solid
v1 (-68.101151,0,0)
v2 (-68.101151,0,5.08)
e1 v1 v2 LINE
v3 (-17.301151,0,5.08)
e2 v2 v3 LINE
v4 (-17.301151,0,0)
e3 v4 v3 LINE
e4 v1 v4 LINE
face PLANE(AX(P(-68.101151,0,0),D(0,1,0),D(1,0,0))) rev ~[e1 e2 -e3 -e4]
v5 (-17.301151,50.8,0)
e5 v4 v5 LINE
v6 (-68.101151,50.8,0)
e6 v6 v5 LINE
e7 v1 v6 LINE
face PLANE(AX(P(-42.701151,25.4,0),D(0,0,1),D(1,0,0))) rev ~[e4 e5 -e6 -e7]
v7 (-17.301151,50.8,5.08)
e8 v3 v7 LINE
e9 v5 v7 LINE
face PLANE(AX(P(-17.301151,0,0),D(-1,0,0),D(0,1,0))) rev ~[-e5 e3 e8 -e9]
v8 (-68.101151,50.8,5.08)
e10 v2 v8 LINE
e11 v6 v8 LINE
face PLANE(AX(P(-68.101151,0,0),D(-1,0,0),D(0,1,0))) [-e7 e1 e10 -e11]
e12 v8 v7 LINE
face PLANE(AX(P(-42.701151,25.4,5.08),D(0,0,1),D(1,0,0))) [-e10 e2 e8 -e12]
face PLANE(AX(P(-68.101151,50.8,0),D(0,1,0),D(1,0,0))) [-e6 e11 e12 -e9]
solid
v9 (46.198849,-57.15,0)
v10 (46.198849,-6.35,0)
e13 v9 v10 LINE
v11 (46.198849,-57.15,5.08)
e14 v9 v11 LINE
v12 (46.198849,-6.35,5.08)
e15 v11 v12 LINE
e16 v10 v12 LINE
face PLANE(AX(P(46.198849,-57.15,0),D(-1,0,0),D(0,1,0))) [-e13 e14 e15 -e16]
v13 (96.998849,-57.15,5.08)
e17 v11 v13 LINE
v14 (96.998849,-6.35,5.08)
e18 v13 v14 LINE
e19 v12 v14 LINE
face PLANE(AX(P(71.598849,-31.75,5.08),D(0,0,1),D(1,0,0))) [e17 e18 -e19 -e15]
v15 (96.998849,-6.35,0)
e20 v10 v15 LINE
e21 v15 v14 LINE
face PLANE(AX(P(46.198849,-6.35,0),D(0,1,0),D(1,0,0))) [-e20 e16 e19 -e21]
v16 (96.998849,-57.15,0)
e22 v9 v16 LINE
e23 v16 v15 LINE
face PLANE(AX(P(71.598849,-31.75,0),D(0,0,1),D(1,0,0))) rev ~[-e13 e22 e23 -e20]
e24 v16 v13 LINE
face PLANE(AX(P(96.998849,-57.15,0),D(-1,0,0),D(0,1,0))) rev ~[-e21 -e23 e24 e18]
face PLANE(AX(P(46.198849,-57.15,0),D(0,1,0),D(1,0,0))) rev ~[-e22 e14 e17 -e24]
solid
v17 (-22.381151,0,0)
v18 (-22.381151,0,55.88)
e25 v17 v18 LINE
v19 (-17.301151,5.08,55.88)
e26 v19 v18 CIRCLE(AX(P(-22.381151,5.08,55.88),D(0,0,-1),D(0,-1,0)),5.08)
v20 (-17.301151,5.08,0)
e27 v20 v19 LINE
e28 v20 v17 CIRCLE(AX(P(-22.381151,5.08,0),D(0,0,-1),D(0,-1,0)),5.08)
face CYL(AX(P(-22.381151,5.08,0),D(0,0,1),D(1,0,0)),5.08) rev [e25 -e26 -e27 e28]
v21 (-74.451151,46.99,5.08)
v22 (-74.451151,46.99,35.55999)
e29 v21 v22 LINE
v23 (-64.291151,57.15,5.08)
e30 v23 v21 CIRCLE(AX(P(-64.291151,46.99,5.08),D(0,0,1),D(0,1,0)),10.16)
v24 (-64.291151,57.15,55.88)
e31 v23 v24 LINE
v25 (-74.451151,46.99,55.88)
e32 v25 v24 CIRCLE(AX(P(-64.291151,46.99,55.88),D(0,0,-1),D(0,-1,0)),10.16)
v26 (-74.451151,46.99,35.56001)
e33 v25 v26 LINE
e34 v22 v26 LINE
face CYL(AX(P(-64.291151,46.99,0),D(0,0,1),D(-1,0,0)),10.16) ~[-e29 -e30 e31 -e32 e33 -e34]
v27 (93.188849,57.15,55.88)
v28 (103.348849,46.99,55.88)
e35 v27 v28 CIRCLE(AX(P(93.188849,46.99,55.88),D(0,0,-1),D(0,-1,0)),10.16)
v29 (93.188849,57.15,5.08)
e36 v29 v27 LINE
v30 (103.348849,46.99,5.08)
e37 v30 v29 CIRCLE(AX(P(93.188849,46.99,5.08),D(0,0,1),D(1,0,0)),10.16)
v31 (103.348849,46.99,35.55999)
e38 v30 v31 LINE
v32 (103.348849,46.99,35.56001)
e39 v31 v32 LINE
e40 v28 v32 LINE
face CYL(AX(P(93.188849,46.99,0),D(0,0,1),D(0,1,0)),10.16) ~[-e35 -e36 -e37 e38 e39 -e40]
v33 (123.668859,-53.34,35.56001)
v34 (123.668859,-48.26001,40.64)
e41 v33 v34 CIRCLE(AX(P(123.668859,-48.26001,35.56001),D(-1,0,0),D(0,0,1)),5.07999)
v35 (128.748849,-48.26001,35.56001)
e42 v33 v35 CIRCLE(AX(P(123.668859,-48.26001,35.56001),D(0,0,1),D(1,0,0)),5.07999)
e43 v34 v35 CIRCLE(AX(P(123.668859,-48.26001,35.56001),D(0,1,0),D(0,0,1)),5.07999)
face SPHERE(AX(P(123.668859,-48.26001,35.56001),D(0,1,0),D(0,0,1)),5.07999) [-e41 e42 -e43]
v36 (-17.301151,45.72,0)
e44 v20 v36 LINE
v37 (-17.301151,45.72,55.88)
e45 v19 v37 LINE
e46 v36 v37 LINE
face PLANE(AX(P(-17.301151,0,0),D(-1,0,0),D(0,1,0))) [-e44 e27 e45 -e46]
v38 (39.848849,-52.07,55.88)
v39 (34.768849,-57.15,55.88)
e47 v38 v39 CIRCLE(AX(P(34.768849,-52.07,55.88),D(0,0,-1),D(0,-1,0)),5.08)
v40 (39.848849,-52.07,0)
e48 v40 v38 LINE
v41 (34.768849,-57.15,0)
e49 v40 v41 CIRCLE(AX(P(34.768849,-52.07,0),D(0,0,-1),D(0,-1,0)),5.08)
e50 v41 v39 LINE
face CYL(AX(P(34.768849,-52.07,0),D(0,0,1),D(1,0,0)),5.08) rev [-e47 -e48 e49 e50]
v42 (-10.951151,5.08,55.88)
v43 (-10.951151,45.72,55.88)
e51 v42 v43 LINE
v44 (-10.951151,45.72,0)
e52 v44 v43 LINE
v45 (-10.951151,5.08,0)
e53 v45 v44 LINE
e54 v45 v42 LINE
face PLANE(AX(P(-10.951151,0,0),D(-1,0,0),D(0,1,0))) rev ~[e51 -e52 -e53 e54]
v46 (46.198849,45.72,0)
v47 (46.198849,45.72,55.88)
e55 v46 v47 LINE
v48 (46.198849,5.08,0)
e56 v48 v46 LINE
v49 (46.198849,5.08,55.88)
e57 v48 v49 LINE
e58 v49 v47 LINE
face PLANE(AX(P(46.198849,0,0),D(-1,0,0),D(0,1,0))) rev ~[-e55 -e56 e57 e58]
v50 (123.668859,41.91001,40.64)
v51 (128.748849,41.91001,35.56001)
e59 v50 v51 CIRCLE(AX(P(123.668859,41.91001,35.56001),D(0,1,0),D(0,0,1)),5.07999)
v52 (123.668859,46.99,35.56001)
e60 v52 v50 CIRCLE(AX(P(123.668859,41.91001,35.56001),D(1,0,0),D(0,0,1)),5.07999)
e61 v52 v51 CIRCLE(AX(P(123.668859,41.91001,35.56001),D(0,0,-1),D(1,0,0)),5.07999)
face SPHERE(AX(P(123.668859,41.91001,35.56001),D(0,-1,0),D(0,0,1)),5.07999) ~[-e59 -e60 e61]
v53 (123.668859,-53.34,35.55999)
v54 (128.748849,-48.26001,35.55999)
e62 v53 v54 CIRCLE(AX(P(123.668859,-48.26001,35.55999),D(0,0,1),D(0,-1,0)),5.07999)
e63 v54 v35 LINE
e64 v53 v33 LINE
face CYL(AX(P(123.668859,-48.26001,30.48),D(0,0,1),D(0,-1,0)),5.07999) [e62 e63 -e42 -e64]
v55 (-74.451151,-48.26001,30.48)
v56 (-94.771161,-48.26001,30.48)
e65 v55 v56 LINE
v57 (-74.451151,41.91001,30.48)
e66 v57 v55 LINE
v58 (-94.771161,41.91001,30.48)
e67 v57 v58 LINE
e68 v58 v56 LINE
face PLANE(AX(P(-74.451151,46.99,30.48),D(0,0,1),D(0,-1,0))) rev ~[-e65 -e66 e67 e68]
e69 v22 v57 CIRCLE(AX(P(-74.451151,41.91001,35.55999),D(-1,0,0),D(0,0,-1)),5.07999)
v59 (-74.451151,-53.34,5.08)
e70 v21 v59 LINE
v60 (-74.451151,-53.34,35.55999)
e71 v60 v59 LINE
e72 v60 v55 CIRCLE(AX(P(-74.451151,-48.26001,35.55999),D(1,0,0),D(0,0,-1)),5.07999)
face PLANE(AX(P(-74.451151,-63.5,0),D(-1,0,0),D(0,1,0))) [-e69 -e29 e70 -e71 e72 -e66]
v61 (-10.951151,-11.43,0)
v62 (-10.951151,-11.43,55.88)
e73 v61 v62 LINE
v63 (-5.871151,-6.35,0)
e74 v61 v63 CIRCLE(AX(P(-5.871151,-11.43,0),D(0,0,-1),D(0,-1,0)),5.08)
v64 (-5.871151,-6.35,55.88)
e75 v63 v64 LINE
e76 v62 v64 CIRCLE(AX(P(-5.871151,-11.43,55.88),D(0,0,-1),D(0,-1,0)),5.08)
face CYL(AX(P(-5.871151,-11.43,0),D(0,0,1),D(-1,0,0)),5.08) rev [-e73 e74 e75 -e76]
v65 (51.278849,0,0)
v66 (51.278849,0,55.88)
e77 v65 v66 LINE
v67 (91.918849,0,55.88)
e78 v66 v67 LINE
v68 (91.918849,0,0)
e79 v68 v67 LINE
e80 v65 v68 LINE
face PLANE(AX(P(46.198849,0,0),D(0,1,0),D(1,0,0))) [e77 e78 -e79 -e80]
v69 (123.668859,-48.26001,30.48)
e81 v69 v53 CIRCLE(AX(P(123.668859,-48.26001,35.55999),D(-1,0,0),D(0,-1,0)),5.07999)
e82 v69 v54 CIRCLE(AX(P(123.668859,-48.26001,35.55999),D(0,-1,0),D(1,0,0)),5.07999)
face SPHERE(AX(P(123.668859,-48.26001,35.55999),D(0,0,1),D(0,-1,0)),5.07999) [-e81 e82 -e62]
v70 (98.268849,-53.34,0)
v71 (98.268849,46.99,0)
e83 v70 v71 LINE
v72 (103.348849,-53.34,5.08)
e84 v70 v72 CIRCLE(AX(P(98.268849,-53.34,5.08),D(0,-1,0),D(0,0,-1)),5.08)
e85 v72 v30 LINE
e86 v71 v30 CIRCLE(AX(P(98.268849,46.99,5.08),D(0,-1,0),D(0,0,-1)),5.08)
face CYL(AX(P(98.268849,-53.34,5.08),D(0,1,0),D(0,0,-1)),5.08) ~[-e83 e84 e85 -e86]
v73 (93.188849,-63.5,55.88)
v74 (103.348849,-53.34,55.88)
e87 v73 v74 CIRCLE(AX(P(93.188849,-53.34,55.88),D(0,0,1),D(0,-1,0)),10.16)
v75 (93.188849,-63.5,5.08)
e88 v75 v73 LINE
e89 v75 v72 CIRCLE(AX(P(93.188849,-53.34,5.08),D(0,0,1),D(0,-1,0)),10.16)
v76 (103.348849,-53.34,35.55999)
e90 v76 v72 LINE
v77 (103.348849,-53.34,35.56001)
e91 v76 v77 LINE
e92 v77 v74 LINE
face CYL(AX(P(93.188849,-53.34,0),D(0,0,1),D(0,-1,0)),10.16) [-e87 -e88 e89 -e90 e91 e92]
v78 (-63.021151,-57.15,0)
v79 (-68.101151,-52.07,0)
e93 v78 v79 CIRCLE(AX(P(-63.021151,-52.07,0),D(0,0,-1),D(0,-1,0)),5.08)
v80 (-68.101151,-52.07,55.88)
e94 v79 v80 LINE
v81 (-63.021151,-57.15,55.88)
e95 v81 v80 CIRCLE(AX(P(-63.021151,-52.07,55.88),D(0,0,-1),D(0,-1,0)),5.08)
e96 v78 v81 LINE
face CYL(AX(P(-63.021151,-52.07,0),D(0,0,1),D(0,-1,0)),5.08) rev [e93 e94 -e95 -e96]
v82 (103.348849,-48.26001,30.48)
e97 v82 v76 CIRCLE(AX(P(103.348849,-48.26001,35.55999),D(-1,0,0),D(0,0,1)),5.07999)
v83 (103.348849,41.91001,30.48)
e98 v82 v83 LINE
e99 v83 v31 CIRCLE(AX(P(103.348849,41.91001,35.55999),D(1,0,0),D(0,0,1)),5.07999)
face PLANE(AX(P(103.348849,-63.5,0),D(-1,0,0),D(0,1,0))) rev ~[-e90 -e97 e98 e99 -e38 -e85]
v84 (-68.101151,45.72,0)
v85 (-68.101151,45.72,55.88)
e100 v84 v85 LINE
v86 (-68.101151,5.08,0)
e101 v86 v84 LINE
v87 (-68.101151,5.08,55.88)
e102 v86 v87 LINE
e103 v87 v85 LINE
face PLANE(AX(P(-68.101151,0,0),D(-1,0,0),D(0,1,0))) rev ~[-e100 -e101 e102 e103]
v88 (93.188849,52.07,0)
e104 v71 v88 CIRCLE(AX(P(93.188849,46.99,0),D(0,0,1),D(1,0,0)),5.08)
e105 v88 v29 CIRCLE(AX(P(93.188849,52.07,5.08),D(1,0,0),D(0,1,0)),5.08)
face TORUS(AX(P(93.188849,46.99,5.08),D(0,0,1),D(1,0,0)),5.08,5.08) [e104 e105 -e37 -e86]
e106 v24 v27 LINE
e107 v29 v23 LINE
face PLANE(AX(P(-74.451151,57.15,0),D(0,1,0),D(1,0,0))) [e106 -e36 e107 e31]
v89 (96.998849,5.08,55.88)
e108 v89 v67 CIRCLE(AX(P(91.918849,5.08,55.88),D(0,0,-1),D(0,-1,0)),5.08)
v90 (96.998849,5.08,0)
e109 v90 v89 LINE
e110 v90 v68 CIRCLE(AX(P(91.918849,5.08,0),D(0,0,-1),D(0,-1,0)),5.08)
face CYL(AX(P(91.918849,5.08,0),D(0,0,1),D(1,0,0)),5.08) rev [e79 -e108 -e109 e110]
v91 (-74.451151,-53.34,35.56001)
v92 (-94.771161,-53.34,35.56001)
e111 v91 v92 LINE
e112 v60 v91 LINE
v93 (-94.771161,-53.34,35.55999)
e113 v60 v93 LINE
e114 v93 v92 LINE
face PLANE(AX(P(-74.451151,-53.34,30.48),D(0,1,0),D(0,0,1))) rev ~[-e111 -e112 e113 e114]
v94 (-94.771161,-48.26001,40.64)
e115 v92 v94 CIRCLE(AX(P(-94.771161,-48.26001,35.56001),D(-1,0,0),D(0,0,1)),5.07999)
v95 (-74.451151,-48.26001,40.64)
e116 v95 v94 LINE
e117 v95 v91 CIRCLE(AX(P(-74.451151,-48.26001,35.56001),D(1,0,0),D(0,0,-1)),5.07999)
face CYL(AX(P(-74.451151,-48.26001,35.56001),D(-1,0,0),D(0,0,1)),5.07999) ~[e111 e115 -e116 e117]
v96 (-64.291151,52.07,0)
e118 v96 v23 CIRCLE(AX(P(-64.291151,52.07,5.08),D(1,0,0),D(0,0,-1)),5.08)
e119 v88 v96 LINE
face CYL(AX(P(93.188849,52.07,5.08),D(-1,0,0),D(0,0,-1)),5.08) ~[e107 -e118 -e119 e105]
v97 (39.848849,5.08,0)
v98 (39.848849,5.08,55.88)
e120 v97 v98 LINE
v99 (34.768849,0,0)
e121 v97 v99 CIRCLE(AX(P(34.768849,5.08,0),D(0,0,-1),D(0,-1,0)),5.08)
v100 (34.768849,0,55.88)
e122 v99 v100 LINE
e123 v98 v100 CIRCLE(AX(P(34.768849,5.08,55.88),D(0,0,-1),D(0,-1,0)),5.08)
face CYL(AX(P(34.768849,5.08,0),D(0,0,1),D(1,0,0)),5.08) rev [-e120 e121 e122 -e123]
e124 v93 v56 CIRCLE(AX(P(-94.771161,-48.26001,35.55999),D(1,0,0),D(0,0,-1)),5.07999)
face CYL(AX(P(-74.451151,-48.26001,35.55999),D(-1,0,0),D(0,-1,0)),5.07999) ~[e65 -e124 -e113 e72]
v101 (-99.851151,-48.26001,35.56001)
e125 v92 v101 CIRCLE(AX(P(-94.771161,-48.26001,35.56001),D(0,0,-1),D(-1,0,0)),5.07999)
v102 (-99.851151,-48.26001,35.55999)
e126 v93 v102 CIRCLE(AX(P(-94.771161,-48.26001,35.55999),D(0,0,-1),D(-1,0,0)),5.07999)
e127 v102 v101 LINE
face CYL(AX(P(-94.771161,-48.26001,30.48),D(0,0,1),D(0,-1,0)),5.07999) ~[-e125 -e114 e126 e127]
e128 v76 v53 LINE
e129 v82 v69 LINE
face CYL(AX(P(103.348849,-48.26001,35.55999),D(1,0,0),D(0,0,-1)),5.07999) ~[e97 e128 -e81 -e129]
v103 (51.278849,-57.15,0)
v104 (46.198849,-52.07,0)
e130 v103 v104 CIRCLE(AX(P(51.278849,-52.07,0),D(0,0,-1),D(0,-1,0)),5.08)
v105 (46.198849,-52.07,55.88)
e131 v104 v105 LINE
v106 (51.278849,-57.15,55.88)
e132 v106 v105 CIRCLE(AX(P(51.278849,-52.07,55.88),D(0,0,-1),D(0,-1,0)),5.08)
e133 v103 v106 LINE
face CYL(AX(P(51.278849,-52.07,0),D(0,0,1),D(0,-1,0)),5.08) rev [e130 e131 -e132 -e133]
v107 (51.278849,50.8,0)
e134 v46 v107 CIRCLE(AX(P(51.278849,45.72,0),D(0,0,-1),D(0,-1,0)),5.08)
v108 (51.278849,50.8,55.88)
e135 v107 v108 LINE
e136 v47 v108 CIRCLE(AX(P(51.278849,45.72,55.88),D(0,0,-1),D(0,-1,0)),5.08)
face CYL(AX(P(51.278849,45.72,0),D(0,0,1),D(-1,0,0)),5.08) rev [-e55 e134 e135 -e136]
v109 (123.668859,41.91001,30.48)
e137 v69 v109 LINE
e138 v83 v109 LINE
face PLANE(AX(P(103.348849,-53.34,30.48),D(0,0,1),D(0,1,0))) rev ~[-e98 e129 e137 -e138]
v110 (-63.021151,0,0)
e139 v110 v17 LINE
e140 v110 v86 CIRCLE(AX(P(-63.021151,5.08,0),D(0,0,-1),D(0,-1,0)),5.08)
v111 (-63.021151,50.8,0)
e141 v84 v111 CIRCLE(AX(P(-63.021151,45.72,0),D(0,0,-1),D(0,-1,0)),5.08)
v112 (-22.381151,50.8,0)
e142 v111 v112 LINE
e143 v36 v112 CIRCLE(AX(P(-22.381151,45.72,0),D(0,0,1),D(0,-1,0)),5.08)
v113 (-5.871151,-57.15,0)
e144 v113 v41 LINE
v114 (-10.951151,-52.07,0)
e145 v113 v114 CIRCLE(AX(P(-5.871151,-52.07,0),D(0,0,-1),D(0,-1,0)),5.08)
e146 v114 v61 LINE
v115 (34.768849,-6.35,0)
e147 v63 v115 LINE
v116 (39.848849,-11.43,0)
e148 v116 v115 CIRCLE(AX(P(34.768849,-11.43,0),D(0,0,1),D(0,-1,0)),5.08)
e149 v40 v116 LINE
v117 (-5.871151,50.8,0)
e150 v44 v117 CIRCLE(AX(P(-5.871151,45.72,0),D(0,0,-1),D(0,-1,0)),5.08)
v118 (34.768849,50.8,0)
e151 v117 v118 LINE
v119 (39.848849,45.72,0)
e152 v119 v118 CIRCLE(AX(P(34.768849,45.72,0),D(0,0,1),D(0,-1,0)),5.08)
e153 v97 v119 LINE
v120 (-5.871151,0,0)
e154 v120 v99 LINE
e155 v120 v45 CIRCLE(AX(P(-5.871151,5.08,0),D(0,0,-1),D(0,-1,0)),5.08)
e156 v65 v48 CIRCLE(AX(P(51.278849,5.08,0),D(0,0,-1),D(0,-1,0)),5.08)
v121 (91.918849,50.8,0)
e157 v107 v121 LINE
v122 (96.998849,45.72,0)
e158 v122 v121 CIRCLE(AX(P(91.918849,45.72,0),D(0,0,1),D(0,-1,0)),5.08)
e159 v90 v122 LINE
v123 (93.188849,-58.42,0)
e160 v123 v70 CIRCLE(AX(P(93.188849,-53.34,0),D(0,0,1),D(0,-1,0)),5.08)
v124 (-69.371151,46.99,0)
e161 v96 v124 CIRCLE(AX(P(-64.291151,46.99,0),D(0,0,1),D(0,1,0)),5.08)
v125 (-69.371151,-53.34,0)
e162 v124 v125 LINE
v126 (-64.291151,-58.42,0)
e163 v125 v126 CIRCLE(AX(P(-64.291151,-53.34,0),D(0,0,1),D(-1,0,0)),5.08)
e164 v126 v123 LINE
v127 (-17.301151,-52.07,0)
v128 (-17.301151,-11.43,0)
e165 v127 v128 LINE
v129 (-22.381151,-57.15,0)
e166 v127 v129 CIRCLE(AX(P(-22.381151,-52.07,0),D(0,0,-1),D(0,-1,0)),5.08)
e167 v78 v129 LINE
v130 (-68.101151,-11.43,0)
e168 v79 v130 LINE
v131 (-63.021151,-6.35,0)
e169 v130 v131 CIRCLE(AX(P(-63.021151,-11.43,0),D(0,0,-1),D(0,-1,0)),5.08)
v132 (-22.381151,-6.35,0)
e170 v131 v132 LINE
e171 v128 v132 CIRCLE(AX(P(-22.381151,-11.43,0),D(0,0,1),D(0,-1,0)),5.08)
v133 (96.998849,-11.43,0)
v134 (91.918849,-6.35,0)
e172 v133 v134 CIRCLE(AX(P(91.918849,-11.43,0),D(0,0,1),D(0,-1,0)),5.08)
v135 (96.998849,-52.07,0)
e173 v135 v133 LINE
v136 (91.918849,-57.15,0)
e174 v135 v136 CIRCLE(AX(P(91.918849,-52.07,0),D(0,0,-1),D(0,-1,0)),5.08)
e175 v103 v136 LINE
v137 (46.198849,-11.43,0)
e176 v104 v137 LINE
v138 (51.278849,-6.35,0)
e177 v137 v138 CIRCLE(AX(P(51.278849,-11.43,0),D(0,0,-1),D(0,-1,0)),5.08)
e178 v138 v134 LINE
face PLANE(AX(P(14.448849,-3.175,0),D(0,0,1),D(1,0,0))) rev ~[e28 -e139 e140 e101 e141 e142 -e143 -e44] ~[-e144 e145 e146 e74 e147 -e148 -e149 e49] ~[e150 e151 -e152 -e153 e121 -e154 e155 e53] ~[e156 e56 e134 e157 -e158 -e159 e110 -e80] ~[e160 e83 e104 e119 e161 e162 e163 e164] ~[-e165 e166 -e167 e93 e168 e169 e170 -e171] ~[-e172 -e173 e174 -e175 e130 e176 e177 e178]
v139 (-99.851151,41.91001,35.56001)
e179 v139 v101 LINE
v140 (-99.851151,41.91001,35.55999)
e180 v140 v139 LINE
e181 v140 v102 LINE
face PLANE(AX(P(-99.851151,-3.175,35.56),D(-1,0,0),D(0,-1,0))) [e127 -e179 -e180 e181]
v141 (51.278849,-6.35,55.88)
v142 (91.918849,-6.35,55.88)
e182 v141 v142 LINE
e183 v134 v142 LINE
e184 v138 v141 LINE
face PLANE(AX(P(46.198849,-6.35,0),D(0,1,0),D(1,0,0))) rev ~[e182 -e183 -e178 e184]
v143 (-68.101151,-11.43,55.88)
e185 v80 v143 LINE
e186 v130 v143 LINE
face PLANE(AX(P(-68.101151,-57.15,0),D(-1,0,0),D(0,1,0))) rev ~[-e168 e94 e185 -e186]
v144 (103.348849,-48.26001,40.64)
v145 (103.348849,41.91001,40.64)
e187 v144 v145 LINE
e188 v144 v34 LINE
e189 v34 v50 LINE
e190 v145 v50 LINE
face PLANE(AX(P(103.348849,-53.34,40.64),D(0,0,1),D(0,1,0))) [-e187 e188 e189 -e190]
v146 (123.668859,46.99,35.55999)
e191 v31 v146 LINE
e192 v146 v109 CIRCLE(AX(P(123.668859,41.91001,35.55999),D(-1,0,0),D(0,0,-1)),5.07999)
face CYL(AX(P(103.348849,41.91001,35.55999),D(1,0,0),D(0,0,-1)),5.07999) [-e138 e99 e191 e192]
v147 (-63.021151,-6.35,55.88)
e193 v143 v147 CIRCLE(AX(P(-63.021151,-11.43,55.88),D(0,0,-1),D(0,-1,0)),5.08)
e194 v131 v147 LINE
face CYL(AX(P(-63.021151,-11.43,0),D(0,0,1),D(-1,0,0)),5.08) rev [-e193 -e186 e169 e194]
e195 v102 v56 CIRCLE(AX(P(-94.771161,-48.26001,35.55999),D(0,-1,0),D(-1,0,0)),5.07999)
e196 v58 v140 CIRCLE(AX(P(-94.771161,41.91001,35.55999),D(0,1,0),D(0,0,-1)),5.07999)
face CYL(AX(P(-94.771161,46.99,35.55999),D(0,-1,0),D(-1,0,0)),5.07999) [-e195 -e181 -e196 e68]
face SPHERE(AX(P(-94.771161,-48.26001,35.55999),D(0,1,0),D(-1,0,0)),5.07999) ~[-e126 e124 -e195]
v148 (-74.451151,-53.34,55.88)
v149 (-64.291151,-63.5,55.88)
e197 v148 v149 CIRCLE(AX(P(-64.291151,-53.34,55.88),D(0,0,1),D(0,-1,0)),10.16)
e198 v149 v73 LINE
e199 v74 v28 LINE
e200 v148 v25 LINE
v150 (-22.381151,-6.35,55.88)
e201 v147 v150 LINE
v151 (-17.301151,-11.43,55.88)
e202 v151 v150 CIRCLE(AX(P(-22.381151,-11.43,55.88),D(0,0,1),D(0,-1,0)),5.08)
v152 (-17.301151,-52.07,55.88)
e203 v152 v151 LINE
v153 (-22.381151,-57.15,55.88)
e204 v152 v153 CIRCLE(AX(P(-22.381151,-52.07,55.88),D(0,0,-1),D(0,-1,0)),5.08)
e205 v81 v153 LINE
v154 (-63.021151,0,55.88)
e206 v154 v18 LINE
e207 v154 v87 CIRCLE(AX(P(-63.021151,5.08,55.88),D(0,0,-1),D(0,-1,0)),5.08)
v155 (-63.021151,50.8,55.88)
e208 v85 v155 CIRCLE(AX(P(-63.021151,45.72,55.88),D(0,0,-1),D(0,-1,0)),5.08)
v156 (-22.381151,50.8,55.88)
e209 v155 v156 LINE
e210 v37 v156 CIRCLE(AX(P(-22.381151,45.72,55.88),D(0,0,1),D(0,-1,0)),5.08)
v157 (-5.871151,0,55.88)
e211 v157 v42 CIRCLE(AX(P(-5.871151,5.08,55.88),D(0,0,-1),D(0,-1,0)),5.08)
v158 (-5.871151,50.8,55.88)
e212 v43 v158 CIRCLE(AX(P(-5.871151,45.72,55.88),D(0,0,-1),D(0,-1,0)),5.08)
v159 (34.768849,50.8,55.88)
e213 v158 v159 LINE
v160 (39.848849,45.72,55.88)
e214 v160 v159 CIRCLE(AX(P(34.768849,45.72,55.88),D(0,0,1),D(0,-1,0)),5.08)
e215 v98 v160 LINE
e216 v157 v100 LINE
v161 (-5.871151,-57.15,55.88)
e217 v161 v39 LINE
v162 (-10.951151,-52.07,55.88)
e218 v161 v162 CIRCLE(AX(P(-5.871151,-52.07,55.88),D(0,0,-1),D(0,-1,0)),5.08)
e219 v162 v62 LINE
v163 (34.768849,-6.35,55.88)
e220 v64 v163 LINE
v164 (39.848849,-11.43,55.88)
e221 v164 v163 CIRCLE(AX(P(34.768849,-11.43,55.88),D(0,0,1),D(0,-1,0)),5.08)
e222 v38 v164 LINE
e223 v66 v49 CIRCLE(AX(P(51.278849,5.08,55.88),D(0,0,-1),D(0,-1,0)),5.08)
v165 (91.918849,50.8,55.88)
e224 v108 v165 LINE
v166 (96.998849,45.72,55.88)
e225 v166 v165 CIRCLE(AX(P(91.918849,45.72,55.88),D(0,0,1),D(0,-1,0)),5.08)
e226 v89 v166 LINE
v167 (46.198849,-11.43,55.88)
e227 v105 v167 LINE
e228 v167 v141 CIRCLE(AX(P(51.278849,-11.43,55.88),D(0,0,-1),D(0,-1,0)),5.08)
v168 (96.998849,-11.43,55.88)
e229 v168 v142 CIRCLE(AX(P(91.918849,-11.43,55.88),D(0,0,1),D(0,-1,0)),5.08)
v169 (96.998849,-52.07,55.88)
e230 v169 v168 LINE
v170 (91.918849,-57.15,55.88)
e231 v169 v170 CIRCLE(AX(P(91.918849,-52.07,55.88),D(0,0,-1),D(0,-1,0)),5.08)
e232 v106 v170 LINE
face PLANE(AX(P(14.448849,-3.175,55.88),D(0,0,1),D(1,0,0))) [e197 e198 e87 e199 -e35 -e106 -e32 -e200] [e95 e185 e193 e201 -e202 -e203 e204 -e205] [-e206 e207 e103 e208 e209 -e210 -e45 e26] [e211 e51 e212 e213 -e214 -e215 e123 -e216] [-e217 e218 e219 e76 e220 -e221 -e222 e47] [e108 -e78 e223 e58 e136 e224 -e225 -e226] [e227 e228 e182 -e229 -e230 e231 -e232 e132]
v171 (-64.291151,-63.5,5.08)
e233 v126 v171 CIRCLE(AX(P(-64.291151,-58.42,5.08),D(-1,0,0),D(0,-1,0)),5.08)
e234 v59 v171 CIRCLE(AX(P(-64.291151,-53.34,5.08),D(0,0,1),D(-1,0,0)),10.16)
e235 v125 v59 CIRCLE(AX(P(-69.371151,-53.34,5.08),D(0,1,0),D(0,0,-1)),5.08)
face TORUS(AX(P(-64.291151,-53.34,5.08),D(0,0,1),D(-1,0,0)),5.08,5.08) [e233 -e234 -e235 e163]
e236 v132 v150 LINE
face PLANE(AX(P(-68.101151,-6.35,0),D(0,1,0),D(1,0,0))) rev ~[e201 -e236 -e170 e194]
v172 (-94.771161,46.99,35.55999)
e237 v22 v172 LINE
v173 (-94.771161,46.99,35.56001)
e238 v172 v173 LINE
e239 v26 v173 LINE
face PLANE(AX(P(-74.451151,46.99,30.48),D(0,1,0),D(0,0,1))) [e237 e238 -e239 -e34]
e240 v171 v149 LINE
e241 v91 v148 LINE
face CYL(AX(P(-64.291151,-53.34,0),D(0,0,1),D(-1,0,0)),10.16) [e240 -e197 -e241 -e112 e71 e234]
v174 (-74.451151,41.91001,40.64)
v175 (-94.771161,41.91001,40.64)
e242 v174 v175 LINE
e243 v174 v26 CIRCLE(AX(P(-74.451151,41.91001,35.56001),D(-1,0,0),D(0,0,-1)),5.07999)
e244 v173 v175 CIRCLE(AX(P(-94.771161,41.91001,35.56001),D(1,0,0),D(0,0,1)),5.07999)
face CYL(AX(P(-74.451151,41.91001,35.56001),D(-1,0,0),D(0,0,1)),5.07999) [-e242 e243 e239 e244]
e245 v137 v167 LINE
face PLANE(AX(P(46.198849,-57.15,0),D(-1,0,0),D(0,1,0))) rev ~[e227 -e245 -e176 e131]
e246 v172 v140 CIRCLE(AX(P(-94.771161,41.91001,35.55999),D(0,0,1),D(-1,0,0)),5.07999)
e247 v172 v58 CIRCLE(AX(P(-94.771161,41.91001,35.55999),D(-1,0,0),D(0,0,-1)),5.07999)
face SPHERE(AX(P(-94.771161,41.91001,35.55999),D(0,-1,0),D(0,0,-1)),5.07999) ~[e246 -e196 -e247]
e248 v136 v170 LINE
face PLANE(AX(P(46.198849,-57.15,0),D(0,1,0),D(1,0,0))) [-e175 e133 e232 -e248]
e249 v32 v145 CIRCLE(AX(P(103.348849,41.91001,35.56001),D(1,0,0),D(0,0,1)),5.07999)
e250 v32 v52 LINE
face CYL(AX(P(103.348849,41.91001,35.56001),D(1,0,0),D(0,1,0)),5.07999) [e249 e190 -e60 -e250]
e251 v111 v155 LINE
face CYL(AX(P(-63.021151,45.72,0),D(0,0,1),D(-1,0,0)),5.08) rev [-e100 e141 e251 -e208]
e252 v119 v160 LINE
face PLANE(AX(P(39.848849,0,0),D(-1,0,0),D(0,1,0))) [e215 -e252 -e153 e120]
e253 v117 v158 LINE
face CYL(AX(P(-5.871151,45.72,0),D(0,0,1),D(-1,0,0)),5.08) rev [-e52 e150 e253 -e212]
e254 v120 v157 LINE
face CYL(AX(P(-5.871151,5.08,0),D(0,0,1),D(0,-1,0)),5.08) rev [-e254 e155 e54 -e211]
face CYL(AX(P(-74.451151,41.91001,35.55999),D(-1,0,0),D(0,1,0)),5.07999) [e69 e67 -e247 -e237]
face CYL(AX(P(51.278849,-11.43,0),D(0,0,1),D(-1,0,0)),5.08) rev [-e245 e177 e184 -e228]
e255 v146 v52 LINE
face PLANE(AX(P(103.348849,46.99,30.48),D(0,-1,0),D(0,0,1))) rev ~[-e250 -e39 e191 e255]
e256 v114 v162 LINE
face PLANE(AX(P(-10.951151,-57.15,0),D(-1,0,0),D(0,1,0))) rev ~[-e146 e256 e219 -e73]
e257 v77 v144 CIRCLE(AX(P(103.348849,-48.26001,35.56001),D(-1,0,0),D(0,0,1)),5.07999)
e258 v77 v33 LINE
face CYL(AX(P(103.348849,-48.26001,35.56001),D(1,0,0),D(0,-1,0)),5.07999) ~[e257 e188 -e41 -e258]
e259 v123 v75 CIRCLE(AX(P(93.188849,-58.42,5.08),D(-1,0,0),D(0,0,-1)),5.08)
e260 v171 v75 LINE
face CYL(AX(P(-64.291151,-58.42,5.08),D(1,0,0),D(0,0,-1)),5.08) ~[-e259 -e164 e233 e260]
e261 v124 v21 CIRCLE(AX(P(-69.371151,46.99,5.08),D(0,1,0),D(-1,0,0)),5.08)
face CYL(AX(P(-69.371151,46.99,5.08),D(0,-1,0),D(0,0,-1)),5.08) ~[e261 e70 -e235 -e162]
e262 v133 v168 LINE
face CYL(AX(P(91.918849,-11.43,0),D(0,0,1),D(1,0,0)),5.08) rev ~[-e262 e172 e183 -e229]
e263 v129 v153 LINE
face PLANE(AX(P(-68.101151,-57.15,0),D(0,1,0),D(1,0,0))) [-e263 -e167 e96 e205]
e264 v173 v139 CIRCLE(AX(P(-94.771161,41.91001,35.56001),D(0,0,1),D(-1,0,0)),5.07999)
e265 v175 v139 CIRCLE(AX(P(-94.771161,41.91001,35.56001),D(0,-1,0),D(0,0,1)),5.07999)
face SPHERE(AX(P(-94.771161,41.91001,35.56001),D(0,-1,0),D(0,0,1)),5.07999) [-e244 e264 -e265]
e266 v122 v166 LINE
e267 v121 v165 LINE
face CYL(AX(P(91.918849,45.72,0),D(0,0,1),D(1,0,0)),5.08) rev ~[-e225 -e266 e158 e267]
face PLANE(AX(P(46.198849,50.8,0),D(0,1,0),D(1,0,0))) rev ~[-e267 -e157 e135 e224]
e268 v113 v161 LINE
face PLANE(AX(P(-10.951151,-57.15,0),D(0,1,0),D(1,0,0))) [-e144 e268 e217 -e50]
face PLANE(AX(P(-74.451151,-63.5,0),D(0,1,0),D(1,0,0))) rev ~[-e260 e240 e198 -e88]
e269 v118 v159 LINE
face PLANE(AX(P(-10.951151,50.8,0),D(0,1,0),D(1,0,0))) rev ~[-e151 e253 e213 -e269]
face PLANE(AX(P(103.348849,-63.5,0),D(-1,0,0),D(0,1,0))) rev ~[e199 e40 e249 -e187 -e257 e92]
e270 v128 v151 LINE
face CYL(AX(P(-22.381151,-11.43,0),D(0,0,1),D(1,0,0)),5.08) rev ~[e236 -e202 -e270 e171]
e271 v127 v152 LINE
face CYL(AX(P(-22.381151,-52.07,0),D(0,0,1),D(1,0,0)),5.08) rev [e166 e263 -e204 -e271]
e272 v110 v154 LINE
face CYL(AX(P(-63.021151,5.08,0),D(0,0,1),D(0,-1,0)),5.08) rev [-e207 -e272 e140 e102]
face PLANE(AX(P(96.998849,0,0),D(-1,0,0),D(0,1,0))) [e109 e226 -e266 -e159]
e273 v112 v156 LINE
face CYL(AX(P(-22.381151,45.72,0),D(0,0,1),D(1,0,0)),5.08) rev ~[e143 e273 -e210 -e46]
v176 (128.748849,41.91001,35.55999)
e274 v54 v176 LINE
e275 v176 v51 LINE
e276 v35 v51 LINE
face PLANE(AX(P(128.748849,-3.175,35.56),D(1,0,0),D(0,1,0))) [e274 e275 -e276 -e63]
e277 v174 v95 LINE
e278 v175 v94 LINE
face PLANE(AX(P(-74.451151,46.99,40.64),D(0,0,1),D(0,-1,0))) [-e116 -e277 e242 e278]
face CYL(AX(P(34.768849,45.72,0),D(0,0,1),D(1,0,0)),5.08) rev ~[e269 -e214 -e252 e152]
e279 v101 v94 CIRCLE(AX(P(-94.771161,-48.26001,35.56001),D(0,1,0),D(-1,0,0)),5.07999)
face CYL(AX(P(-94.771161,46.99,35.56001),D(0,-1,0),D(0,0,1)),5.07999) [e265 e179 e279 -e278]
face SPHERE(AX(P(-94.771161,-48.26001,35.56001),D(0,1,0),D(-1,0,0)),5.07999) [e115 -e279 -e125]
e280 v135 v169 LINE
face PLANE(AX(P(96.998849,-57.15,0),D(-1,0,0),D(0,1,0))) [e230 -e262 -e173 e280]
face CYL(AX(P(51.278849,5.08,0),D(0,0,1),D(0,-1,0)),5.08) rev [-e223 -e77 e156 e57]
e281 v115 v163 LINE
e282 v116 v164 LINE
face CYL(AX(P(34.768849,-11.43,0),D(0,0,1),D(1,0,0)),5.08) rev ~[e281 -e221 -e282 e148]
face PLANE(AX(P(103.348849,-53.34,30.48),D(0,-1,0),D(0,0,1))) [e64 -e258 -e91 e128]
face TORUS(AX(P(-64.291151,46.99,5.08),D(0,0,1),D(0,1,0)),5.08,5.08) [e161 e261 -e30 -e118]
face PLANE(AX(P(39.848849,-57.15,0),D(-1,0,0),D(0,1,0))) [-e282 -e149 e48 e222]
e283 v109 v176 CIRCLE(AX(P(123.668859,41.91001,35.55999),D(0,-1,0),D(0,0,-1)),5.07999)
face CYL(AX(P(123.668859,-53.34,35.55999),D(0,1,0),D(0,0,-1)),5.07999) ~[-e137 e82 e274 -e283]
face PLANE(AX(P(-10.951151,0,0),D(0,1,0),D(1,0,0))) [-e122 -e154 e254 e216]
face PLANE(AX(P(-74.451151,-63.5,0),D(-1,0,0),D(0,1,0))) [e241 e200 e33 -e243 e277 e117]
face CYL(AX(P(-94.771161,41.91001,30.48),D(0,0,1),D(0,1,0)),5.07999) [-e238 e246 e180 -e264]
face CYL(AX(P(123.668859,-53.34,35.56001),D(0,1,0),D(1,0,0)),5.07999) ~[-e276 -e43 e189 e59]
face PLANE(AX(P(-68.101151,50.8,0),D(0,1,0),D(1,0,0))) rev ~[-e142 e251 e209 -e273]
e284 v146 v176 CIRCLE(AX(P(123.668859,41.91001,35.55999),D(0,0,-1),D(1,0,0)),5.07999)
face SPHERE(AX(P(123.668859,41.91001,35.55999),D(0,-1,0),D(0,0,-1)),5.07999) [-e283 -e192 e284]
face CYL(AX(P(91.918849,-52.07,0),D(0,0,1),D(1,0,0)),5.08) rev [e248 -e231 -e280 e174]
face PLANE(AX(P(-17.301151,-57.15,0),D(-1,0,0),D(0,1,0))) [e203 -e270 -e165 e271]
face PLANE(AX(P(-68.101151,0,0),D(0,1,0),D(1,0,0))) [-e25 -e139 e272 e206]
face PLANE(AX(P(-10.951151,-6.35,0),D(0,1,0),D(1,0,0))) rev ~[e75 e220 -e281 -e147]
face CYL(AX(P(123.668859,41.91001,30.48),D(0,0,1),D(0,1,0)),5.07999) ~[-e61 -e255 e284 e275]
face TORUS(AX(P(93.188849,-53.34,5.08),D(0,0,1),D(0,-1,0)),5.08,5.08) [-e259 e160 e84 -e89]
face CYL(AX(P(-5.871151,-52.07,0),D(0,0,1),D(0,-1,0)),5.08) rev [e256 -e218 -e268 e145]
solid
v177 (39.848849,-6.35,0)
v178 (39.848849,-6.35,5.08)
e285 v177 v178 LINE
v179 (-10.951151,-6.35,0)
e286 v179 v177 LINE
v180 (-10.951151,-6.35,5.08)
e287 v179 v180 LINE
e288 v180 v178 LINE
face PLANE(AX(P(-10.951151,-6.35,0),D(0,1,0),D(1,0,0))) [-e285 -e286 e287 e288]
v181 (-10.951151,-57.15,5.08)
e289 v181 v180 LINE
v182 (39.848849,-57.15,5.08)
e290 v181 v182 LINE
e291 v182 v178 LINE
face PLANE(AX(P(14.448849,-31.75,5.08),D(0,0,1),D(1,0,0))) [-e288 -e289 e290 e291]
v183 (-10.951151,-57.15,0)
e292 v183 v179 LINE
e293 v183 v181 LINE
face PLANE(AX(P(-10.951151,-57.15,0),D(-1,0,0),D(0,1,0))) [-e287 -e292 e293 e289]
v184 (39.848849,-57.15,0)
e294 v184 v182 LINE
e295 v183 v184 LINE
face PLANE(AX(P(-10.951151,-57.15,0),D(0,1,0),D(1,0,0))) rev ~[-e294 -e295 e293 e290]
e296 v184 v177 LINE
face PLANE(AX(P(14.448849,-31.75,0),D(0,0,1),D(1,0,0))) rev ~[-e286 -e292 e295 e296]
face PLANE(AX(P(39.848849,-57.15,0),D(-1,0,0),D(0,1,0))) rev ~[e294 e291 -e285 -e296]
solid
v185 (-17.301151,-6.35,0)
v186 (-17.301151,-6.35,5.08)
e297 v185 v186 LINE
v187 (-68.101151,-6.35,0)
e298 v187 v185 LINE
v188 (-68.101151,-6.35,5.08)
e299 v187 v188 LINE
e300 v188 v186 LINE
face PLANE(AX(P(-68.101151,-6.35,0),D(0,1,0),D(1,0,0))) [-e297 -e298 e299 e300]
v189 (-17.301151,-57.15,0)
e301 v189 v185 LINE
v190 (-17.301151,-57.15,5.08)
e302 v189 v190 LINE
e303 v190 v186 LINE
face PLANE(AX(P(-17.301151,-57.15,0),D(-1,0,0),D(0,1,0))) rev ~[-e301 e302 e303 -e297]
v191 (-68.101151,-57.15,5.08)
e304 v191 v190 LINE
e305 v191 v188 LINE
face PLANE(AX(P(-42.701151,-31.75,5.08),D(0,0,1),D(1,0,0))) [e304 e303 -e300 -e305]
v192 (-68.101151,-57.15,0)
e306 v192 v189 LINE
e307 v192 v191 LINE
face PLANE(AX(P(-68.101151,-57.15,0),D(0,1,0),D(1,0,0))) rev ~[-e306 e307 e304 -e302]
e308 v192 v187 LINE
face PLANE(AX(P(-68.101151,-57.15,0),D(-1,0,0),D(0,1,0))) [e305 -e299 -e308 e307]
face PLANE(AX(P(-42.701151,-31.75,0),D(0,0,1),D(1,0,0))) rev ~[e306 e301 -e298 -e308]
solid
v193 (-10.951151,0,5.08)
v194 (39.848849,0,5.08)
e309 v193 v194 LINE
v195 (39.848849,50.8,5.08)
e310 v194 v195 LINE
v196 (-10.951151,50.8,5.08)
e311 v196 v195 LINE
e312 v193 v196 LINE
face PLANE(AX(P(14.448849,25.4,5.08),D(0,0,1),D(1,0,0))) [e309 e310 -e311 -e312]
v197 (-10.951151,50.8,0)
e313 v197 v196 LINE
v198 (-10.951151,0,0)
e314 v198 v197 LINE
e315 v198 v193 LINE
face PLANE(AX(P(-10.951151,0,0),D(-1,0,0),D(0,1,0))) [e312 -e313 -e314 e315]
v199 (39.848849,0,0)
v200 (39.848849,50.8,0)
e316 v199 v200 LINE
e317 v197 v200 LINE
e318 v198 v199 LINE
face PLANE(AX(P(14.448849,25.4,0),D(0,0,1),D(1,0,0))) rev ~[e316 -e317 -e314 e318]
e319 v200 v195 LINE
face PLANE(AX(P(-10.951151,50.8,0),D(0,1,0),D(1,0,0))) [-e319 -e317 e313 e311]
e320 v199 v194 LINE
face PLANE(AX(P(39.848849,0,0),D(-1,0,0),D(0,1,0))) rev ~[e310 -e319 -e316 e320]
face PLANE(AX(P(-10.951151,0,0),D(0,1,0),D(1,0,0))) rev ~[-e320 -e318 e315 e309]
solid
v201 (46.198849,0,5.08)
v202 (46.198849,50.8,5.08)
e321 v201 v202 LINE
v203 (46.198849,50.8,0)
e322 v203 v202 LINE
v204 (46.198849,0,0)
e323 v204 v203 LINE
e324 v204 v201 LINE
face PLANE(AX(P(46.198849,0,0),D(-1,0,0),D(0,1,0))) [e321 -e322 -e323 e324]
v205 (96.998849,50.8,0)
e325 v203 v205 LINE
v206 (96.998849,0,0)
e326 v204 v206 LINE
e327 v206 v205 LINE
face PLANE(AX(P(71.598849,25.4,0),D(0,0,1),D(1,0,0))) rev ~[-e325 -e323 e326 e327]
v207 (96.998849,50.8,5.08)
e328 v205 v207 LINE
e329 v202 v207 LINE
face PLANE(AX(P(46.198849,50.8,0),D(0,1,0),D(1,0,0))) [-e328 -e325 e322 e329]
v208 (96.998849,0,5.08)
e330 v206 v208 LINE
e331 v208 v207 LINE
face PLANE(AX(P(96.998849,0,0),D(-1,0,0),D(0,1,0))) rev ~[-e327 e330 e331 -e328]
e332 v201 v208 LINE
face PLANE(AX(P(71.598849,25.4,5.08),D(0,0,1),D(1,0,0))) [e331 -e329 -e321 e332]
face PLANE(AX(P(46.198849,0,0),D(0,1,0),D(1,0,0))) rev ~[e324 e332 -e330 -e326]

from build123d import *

# Parameters (mm, degrees)
F0_W     = 50.8
F0_H     = 50.8
F1_DEPTH = 5.08
F0_W_2   = 177.8
F0_H_2   = 120.65
F2_DEPTH = 55.88
F3_R     = 10.16
F4_R     = 5.08
F5_W     = 100.33
F5_H     = 10.16
F6_DEPTH = 25.4
F7_R     = 5.07999
F8_W     = 100.33
F8_H     = 10.16
F9_DEPTH = 25.4
F10_R    = 5.07999


# Not quite as in the source:
# - a fillet or chamfer is up to 0.001 mm smaller than in the source, because OpenCascade refuses the exact size


with BuildPart() as f1:
    # F0 (on Top) → F1 (new body)
    with BuildSketch(Plane.XY):
        with Locations((71.5988487065, -31.75)):
            Rectangle(F0_W, F0_H)
    extrude(amount=F1_DEPTH)


with BuildPart() as f1b:
    # F0 (on Top) → F1, piece 2 (new body)
    with BuildSketch(Plane.XY):
        with Locations((14.4488487065, -31.75)):
            Rectangle(F0_W, F0_H)
    extrude(amount=F1_DEPTH)


with BuildPart() as f1c:
    # F0 (on Top) → F1, piece 3 (new body)
    with BuildSketch(Plane.XY):
        with Locations((-42.7011512935, -31.75)):
            Rectangle(F0_W, F0_H)
    extrude(amount=F1_DEPTH)


with BuildPart() as f1d:
    # F0 (on Top) → F1, piece 4 (new body)
    with BuildSketch(Plane.XY):
        with Locations((-42.7011512935, 25.4)):
            Rectangle(F0_W, F0_H)
    extrude(amount=F1_DEPTH)


with BuildPart() as f1e:
    # F0 (on Top) → F1, piece 5 (new body)
    with BuildSketch(Plane.XY):
        with Locations((14.4488487065, 25.4)):
            Rectangle(F0_W, F0_H)
    extrude(amount=F1_DEPTH)


with BuildPart() as f1f:
    # F0 (on Top) → F1, piece 6 (new body)
    with BuildSketch(Plane.XY):
        with Locations((71.5988487065, 25.4)):
            Rectangle(F0_W, F0_H)
    extrude(amount=F1_DEPTH)


with BuildPart() as f2:
    # F0 (on Top) → F2 (new body)
    with BuildSketch(Plane.XY):
        with Locations((14.4488487065, -3.175)):
            Rectangle(F0_W_2, F0_H_2)
        with Locations((-42.7011512935, -31.75)):
            Rectangle(F0_W, F0_H, mode=Mode.SUBTRACT)
        with Locations((14.4488487065, -31.75)):
            Rectangle(F0_W, F0_H, mode=Mode.SUBTRACT)
        with Locations((71.5988487065, -31.75)):
            Rectangle(F0_W, F0_H, mode=Mode.SUBTRACT)
        with Locations((-42.7011512935, 25.4)):
            Rectangle(F0_W, F0_H, mode=Mode.SUBTRACT)
        with Locations((14.4488487065, 25.4)):
            Rectangle(F0_W, F0_H, mode=Mode.SUBTRACT)
        with Locations((71.5988487065, 25.4)):
            Rectangle(F0_W, F0_H, mode=Mode.SUBTRACT)
    extrude(amount=F2_DEPTH)

    # F3
    f3_edges = [f2.edges().sort_by_distance(p)[0] for p in [
        (103.348849, -63.5, 27.94),
        (103.348849, 57.15, 27.94),
        (-74.451151, 57.15, 27.94),
        (-74.451151, -63.5, 27.94),
    ]]
    fillet(f3_edges, radius=F3_R)

    # F4 (call 1 of 25: OpenCascade refuses the feature's edges together)
    f4_edges = [f2.edges().sort_by_distance(p)[0] for p in [
        (-17.301151, -6.35, 27.94),
    ]]
    fillet(f4_edges, radius=F4_R)

    # F4#2 (call 2 of 25)
    f4_2_edges = [f2.edges().sort_by_distance(p)[0] for p in [
        (-17.301151, 50.8, 27.94),
    ]]
    fillet(f4_2_edges, radius=F4_R)

    # F4#3 (call 3 of 25)
    f4_3_edges = [f2.edges().sort_by_distance(p)[0] for p in [
        (39.848849, 50.8, 27.94),
    ]]
    fillet(f4_3_edges, radius=F4_R)

    # F4#4 (call 4 of 25)
    f4_4_edges = [f2.edges().sort_by_distance(p)[0] for p in [
        (96.998849, 50.8, 27.94),
    ]]
    fillet(f4_4_edges, radius=F4_R)

    # F4#5 (call 5 of 25)
    f4_5_edges = [f2.edges().sort_by_distance(p)[0] for p in [
        (96.998849, -6.35, 27.94),
    ]]
    fillet(f4_5_edges, radius=F4_R)

    # F4#6 (call 6 of 25)
    f4_6_edges = [f2.edges().sort_by_distance(p)[0] for p in [
        (39.848849, -6.35, 27.94),
    ]]
    fillet(f4_6_edges, radius=F4_R)

    # F4#7 (call 7 of 25)
    f4_7_edges = [f2.edges().sort_by_distance(p)[0] for p in [
        (96.998849, 0, 27.94),
    ]]
    fillet(f4_7_edges, radius=F4_R)

    # F4#8 (call 8 of 25)
    f4_8_edges = [f2.edges().sort_by_distance(p)[0] for p in [
        (39.848849, 0, 27.94),
    ]]
    fillet(f4_8_edges, radius=F4_R)

    # F4#9 (call 9 of 25)
    f4_9_edges = [f2.edges().sort_by_distance(p)[0] for p in [
        (-17.301151, 0, 27.94),
    ]]
    fillet(f4_9_edges, radius=F4_R)

    # F4#10 (call 10 of 25)
    f4_10_edges = [f2.edges().sort_by_distance(p)[0] for p in [
        (-17.301151, -57.15, 27.94),
    ]]
    fillet(f4_10_edges, radius=F4_R)

    # F4#11 (call 11 of 25)
    f4_11_edges = [f2.edges().sort_by_distance(p)[0] for p in [
        (39.848849, -57.15, 27.94),
    ]]
    fillet(f4_11_edges, radius=F4_R)

    # F4#12 (call 12 of 25)
    f4_12_edges = [f2.edges().sort_by_distance(p)[0] for p in [
        (96.998849, -57.15, 27.94),
    ]]
    fillet(f4_12_edges, radius=F4_R)

    # F4#13 (call 13 of 25)
    f4_13_edges = [f2.edges().sort_by_distance(p)[0] for p in [
        (46.198849, -57.15, 27.94),
    ]]
    fillet(f4_13_edges, radius=F4_R)

    # F4#14 (call 14 of 25)
    f4_14_edges = [f2.edges().sort_by_distance(p)[0] for p in [
        (46.198849, 0, 27.94),
    ]]
    fillet(f4_14_edges, radius=F4_R)

    # F4#15 (call 15 of 25)
    f4_15_edges = [f2.edges().sort_by_distance(p)[0] for p in [
        (-10.951151, -57.15, 27.94),
    ]]
    fillet(f4_15_edges, radius=F4_R)

    # F4#16 (call 16 of 25)
    f4_16_edges = [f2.edges().sort_by_distance(p)[0] for p in [
        (-10.951151, 0, 27.94),
    ]]
    fillet(f4_16_edges, radius=F4_R)

    # F4#17 (call 17 of 25)
    f4_17_edges = [f2.edges().sort_by_distance(p)[0] for p in [
        (-68.101151, 0, 27.94),
    ]]
    fillet(f4_17_edges, radius=F4_R)

    # F4#18 (call 18 of 25)
    f4_18_edges = [f2.edges().sort_by_distance(p)[0] for p in [
        (-68.101151, -57.15, 27.94),
    ]]
    fillet(f4_18_edges, radius=F4_R)

    # F4#19 (call 19 of 25)
    f4_19_edges = [f2.edges().sort_by_distance(p)[0] for p in [
        (46.198849, -6.35, 27.94),
    ]]
    fillet(f4_19_edges, radius=F4_R)

    # F4#20 (call 20 of 25)
    f4_20_edges = [f2.edges().sort_by_distance(p)[0] for p in [
        (46.198849, 50.8, 27.94),
    ]]
    fillet(f4_20_edges, radius=F4_R)

    # F4#21 (call 21 of 25)
    f4_21_edges = [f2.edges().sort_by_distance(p)[0] for p in [
        (-10.951151, 50.8, 27.94),
    ]]
    fillet(f4_21_edges, radius=F4_R)

    # F4#22 (call 22 of 25)
    f4_22_edges = [f2.edges().sort_by_distance(p)[0] for p in [
        (-10.951151, -6.35, 27.94),
    ]]
    fillet(f4_22_edges, radius=F4_R)

    # F4#23 (call 23 of 25)
    f4_23_edges = [f2.edges().sort_by_distance(p)[0] for p in [
        (-68.101151, -6.35, 27.94),
    ]]
    fillet(f4_23_edges, radius=F4_R)

    # F4#24 (call 24 of 25)
    f4_24_edges = [f2.edges().sort_by_distance(p)[0] for p in [
        (-68.101151, 50.8, 27.94),
    ]]
    fillet(f4_24_edges, radius=F4_R)

    # F4#25 (call 25 of 25)
    f4_25_edges = [f2.edges().sort_by_distance(p)[0] for p in [
        (103.348849, -3.175, 0),
        (14.448849, -63.5, 0),
    ]]
    fillet(f4_25_edges, radius=F4_R)

    # F5 (on face) → F6 (join)
    with BuildSketch(Plane.YZ.offset(103.3488487065)):
        with Locations((-3.175, 35.56)):
            Rectangle(F5_W, F5_H)
    extrude(amount=F6_DEPTH)

    # F7 (radius 5.08 in the source; OpenCascade refuses exactly that, so slightly less here)
    f7_edges = [f2.edges().sort_by_distance(p)[0] for p in [
        (128.748849, -3.175, 40.64),
        (116.048849, -53.34, 40.64),
        (128.748849, -53.34, 35.56),
        (116.048849, -53.34, 30.48),
        (128.748849, -3.175, 30.48),
        (116.048849, 46.99, 40.64),
        (116.048849, 46.99, 30.48),
        (128.748849, 46.99, 35.56),
    ]]
    fillet(f7_edges, radius=F7_R)

    # F8 (on face) → F9 (join)
    with BuildSketch(Plane(origin=(-74.4511512935, 0, 0), x_dir=(0, -1, 0), z_dir=(-1, 0, 0))):
        with Locations((3.175, 35.56)):
            Rectangle(F8_W, F8_H)
    extrude(amount=F9_DEPTH)

    # F10 (radius 5.08 in the source; OpenCascade refuses exactly that, so slightly less here)
    f10_edges = [f2.edges().sort_by_distance(p)[0] for p in [
        (-99.851151, -3.175, 40.64),
        (-99.851151, -3.175, 30.48),
        (-99.851151, -53.34, 35.56),
        (-87.151151, -53.34, 40.64),
        (-87.151151, -53.34, 30.48),
        (-87.151151, 46.99, 30.48),
        (-87.151151, 46.99, 40.64),
        (-99.851151, 46.99, 35.56),
    ]]
    fillet(f10_edges, radius=F10_R)


solid = Compound([f1.part, f1b.part, f1c.part, f1d.part, f1e.part, f1f.part, f2.part])
